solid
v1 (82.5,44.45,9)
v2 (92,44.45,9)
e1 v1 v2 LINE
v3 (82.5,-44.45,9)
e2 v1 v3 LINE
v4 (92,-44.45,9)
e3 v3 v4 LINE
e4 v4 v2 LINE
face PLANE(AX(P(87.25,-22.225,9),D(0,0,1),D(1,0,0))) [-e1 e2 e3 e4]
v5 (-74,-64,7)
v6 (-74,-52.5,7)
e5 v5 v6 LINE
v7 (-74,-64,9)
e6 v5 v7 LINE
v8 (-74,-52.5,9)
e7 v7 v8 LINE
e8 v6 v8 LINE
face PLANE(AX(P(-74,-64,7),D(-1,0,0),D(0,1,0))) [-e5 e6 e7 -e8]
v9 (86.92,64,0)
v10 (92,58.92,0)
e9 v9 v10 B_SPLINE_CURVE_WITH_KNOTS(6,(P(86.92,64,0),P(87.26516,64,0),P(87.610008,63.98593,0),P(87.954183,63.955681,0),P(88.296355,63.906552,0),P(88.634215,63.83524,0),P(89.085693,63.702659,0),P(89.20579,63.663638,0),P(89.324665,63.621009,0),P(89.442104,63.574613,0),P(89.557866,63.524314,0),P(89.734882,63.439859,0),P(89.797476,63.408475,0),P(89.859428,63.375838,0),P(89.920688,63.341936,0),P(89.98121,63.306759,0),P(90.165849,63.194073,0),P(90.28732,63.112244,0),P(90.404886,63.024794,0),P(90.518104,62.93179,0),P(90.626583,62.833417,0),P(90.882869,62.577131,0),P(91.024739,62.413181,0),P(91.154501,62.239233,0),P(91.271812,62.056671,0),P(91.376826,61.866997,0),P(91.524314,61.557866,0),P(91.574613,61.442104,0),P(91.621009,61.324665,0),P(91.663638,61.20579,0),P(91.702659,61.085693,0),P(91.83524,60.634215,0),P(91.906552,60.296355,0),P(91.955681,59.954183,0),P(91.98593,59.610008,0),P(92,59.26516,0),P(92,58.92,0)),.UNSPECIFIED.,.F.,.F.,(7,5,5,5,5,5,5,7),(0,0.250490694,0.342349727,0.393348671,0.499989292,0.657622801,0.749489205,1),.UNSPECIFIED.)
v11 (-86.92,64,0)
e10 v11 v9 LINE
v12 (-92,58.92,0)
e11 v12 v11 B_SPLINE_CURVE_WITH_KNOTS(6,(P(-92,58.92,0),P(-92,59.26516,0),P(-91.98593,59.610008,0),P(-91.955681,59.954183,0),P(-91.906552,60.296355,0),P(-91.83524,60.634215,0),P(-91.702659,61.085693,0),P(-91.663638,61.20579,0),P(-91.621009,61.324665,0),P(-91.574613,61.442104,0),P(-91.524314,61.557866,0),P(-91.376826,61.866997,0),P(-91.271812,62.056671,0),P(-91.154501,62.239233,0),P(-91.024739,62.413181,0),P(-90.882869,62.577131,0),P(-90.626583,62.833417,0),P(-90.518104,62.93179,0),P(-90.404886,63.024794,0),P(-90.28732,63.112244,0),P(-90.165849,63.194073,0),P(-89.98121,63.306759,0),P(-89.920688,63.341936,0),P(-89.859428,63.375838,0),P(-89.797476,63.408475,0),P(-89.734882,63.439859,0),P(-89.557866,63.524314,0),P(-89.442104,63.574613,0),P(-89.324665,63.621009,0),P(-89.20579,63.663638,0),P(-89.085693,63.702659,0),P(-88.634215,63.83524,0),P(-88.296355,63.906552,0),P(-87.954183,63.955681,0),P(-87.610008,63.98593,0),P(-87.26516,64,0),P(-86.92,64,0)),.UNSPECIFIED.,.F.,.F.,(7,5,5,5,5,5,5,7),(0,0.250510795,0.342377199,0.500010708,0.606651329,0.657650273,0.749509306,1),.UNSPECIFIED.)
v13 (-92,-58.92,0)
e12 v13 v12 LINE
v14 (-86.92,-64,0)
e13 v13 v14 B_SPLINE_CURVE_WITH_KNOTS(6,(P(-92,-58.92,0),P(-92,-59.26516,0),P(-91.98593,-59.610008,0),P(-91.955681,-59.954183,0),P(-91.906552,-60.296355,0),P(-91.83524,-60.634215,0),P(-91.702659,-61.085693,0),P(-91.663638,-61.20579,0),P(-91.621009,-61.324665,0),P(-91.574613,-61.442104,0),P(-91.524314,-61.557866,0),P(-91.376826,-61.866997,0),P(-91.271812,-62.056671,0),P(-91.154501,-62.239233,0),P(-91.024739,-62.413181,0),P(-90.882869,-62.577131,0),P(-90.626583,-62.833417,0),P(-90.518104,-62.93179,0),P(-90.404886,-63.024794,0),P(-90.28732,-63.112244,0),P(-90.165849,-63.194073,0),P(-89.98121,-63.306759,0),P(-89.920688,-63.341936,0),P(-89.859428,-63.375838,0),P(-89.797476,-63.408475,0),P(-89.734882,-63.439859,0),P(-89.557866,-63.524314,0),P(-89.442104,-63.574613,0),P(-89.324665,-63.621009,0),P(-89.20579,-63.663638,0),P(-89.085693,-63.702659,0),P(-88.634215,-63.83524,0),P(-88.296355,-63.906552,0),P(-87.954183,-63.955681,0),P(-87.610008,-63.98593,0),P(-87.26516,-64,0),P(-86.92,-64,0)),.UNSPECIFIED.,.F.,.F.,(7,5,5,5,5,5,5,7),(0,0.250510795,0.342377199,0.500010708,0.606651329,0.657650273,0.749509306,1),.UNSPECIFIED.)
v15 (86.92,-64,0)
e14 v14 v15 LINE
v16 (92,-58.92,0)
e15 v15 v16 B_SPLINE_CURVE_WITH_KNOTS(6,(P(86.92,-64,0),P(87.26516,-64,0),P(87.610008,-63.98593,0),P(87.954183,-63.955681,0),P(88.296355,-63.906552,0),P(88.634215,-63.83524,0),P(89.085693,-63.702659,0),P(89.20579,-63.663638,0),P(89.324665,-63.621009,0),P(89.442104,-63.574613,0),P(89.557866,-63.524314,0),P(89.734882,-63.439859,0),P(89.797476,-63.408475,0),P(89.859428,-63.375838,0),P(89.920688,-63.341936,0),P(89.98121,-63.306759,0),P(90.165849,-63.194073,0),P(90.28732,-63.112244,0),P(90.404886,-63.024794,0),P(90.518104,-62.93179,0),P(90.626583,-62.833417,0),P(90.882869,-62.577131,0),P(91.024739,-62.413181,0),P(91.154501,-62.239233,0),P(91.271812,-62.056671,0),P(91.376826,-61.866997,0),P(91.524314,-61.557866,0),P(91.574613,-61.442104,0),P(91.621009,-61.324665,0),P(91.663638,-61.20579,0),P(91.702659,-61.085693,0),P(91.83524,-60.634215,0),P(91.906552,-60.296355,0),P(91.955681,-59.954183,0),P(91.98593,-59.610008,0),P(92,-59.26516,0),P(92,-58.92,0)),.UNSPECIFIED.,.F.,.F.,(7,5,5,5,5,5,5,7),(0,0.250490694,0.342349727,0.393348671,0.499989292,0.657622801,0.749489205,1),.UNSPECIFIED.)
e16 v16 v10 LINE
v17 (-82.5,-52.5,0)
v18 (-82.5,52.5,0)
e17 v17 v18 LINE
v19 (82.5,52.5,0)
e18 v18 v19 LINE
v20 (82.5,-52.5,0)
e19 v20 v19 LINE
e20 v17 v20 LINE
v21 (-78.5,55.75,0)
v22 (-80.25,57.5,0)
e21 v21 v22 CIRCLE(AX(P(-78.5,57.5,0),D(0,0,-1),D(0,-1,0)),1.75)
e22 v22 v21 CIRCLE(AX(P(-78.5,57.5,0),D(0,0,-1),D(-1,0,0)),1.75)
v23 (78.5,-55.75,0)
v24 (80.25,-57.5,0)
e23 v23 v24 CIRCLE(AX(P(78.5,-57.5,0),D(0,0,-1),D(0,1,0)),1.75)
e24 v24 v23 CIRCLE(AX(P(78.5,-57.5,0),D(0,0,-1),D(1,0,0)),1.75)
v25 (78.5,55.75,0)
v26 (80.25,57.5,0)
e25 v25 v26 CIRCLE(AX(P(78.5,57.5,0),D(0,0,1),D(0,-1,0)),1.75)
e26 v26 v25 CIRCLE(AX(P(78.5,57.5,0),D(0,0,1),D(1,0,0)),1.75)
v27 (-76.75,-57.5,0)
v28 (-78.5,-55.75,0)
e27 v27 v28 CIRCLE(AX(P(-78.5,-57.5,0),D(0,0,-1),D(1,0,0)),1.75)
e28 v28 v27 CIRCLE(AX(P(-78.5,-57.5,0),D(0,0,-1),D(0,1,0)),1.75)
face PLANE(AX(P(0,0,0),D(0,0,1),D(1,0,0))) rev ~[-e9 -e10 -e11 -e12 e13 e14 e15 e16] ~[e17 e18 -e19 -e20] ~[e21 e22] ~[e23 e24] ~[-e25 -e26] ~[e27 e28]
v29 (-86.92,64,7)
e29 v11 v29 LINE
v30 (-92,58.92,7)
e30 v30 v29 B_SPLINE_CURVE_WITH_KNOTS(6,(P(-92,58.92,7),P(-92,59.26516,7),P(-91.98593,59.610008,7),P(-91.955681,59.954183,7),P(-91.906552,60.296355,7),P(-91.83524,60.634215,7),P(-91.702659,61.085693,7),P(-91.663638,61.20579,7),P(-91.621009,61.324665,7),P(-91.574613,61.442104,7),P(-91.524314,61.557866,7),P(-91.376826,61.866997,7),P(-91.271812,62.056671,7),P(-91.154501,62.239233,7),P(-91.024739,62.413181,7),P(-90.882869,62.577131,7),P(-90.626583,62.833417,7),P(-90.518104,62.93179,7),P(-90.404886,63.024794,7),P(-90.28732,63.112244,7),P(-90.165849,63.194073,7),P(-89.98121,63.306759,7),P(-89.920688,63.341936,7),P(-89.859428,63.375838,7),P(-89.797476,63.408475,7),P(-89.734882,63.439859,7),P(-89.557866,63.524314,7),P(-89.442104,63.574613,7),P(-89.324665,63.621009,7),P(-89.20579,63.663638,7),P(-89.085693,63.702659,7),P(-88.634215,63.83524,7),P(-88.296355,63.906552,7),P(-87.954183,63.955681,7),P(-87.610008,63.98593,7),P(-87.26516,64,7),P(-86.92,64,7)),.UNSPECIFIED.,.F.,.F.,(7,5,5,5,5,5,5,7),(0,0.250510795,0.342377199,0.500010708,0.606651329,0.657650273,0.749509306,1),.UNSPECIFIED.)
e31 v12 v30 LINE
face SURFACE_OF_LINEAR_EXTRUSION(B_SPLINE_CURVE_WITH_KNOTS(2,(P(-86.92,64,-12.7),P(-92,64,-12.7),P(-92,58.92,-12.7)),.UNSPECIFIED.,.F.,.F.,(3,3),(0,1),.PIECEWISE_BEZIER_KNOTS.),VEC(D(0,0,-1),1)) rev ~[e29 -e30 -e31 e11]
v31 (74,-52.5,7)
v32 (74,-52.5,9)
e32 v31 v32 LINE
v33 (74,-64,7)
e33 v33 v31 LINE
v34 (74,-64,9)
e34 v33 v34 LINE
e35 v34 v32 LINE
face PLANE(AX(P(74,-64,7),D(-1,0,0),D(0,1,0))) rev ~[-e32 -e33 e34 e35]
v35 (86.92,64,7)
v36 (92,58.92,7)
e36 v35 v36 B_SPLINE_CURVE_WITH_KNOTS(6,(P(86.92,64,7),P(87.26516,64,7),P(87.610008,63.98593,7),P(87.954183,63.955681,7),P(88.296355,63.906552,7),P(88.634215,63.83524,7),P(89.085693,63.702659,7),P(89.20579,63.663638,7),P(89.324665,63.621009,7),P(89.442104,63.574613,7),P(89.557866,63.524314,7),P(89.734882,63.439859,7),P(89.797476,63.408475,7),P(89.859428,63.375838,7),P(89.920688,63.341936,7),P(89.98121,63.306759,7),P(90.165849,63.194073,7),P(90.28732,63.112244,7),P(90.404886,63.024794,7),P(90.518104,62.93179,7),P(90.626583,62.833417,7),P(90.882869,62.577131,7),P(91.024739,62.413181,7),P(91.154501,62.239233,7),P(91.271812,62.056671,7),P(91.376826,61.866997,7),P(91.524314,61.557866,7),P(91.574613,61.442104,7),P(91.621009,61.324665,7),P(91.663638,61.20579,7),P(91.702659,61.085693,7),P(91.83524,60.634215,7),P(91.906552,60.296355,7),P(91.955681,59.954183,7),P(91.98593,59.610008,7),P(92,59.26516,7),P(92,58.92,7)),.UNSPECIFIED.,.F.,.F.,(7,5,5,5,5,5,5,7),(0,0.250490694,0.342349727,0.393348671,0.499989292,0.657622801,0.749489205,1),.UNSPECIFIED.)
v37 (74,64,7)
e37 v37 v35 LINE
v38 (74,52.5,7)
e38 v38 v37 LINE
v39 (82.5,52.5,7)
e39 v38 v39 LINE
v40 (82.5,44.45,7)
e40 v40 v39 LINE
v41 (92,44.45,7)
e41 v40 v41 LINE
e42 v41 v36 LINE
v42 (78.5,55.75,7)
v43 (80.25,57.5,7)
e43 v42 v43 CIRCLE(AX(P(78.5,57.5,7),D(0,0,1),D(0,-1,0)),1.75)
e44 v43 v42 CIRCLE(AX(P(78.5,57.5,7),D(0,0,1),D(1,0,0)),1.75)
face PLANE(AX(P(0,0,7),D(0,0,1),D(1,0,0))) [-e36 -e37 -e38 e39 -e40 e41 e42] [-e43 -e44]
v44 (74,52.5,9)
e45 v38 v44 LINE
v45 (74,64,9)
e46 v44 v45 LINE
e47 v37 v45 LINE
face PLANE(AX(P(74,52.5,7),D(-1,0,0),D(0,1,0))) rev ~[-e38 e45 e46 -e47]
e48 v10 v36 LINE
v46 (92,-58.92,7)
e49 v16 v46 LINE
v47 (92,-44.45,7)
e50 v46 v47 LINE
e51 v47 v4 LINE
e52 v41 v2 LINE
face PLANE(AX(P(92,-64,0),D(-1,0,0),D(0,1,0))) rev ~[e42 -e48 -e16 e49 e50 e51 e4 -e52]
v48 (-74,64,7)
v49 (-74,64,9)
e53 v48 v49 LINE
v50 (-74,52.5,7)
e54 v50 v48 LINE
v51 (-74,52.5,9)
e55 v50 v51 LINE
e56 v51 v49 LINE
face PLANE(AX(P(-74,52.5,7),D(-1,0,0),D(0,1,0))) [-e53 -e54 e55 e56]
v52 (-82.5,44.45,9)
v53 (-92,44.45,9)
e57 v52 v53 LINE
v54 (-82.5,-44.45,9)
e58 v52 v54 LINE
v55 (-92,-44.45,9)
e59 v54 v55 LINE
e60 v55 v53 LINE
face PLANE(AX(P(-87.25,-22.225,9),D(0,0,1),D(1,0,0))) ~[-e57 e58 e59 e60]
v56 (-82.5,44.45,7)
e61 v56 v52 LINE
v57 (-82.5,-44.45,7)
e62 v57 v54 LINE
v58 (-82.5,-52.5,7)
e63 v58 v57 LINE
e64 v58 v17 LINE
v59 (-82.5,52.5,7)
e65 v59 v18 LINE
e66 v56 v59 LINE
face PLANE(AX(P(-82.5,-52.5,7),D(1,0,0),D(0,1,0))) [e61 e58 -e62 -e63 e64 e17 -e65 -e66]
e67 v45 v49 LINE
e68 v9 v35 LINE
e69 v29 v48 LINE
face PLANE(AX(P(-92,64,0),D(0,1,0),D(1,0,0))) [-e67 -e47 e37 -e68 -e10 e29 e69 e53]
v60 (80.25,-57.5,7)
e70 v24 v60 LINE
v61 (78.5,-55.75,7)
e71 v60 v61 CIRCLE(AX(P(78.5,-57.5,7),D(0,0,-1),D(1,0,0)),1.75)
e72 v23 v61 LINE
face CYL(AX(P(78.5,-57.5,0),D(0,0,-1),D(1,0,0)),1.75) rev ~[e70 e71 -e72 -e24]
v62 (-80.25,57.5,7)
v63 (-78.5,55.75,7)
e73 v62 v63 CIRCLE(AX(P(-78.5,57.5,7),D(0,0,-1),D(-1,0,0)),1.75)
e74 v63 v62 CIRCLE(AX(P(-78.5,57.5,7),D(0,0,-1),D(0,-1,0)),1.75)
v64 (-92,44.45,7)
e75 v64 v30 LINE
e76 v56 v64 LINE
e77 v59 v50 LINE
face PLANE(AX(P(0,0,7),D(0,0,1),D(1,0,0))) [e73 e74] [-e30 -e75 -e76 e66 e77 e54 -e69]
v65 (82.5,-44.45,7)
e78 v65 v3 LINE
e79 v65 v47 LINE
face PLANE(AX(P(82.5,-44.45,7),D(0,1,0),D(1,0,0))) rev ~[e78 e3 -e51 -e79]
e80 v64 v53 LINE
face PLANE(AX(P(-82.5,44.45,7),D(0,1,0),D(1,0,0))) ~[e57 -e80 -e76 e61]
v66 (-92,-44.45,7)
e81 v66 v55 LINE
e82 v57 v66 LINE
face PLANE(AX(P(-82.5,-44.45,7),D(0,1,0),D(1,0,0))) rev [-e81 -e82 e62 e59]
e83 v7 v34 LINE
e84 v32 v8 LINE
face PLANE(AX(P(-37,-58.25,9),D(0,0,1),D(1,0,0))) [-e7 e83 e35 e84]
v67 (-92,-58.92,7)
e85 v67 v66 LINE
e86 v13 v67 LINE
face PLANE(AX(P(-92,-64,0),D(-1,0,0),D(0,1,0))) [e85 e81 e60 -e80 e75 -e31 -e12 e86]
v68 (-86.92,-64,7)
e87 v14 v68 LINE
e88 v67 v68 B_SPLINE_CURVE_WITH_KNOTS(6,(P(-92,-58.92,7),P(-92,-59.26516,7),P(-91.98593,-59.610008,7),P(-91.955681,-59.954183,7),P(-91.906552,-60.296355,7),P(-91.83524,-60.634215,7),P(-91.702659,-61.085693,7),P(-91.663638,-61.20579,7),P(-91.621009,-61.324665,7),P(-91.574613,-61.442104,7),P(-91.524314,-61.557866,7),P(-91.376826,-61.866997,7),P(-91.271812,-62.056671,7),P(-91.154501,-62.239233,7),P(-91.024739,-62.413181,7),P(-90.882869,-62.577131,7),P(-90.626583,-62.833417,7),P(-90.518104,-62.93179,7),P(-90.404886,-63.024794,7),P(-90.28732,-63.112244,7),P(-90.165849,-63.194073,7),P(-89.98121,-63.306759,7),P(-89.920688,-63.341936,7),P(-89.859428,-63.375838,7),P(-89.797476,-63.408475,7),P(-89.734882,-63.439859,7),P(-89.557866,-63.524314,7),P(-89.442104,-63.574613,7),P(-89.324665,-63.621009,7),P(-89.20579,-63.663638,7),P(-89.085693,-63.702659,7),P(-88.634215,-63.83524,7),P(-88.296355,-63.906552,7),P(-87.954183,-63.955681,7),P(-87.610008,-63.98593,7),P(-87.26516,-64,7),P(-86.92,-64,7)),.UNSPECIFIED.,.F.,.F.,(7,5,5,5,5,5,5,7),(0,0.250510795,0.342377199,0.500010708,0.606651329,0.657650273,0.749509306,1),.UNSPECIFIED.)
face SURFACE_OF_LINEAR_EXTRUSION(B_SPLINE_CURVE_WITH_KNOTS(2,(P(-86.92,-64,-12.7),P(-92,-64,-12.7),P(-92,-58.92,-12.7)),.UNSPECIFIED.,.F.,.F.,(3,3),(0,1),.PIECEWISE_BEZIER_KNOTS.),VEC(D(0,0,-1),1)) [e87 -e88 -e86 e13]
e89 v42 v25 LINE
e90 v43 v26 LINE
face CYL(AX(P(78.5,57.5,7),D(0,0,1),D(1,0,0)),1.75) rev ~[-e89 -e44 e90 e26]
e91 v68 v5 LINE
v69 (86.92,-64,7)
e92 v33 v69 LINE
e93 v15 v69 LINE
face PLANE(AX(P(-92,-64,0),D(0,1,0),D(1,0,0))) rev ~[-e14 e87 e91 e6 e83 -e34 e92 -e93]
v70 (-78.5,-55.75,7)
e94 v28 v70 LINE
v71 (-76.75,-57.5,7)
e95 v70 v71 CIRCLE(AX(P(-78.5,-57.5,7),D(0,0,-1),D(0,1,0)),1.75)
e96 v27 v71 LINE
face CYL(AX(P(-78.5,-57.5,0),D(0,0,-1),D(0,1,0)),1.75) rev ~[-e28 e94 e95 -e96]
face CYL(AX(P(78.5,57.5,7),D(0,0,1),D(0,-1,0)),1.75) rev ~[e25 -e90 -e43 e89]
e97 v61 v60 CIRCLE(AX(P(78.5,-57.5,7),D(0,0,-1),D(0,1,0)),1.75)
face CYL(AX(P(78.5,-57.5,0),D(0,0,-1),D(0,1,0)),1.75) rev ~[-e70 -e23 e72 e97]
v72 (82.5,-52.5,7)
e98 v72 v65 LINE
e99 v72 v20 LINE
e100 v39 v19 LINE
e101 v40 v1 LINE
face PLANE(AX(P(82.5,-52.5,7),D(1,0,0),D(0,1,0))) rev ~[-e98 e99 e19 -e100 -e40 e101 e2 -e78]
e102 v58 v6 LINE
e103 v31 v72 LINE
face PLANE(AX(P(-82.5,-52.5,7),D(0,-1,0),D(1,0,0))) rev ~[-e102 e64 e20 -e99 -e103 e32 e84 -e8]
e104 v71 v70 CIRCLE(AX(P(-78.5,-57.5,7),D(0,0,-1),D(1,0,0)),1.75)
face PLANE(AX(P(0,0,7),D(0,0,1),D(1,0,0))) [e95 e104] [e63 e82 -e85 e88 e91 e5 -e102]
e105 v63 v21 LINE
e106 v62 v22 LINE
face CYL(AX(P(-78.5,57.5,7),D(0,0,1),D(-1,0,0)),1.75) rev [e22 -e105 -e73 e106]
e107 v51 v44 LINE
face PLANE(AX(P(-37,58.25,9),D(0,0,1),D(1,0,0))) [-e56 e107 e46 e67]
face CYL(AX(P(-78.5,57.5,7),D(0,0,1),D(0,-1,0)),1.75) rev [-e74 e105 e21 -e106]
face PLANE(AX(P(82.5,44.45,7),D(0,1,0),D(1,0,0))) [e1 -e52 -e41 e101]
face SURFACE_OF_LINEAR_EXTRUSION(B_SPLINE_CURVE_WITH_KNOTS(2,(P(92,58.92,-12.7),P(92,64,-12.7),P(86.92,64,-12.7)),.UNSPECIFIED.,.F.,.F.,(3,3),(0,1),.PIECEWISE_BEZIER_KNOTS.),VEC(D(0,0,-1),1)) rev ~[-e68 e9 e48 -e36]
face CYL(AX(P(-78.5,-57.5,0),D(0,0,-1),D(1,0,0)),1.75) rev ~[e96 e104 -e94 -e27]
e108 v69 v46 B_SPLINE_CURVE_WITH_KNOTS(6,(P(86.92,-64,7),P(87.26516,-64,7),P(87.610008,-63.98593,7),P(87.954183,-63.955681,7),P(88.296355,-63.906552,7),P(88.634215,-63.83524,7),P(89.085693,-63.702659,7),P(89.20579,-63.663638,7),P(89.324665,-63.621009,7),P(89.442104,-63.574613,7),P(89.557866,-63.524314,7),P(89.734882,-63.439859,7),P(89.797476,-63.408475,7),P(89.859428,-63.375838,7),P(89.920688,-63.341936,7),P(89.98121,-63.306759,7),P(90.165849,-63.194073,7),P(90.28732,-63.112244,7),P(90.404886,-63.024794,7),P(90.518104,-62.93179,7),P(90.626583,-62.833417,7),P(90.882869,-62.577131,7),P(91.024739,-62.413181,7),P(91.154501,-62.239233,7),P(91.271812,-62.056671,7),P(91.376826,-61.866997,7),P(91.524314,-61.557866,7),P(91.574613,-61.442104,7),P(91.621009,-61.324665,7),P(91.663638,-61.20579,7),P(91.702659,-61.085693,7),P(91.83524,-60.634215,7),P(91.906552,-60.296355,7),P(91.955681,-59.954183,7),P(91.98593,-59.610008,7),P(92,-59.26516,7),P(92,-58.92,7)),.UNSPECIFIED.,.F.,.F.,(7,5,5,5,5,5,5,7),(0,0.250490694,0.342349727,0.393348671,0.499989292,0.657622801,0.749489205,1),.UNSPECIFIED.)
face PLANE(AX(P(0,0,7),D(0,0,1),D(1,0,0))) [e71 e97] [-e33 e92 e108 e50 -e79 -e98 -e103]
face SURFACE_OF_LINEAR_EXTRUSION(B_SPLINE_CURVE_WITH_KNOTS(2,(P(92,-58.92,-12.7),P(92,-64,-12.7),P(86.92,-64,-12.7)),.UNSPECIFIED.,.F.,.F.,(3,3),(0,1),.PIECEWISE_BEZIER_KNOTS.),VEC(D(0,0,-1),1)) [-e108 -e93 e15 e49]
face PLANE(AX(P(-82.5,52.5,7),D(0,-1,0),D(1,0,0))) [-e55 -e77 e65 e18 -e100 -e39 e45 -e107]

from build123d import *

# Parameters (mm, degrees)
F0_W        = 184
F0_H        = 128
F1_DEPTH    = 7
F2_W        = 165
F2_H        = 105
F3_DEPTH    = 7
F4_W        = 74
F4_H        = 11.5
F5_DEPTH    = 2
F6_T1_DEPTH = 32.4
F7_W        = 9.5
F7_H        = 44.45
F8_DEPTH    = 2
F10_DEPTH   = 7
F12_DEPTH   = 7


# Not quite as in the source:
# - a fillet or chamfer that OpenCascade refuses, or shapes differently, is made with other operations: its cross-section is extruded or revolved along the edge and cut away or added
# - a pattern or mirror of a feature is missing from the dataset's text; its kind, count and spacing are read off the source's solid


with BuildPart() as f1:
    # F0 (on Top) → F1 (new body)
    with BuildSketch(Plane.XY):
        Rectangle(F0_W, F0_H)
    extrude(amount=F1_DEPTH)

    # F2 (on face) → F3 (cut, through all)
    with BuildSketch(Plane.XY.offset(7)):
        Rectangle(F2_W, F2_H)
    extrude(amount=-F3_DEPTH, mode=Mode.SUBTRACT)

    # F4 (on face) → F5 (join)
    with BuildSketch(Plane.XY.offset(7)):
        with Locations((-37, 58.25)):
            Rectangle(F4_W, F4_H)
        with Locations((37, 58.25)):
            Rectangle(F4_W, F4_H)
        with Locations((-37, -58.25)):
            Rectangle(F4_W, F4_H)
        with Locations((37, -58.25)):
            Rectangle(F4_W, F4_H)
    extrude(amount=F5_DEPTH)

    # F6: fillet of radius 5.08 on 4 edges, made by hand

    # F6_s2 → F6_t1 (cut)
    with BuildSketch(Plane.XY.offset(-12.7)):
        with BuildLine():
            add(Edge.make_bspline(
                [(92, -58.92), (92, -64), (86.92, -64)],
                knots=[0, 0, 0, 1, 1, 1], degree=2, weights=[1, 1, 1]))
            Line((86.92, -64), (92, -64))
            Line((92, -64), (92, -58.92))
        make_face()
        with BuildLine():
            add(Edge.make_bspline(
                [(92, 58.92), (92, 64), (86.92, 64)],
                knots=[0, 0, 0, 1, 1, 1], degree=2, weights=[1, 1, 1]))
            Line((86.92, 64), (92, 64))
            Line((92, 64), (92, 58.92))
        make_face()
        with BuildLine():
            add(Edge.make_bspline(
                [(-86.92, 64), (-92, 64), (-92, 58.92)],
                knots=[0, 0, 0, 1, 1, 1], degree=2, weights=[1, 1, 1]))
            Line((-92, 58.92), (-92, 64))
            Line((-92, 64), (-86.92, 64))
        make_face()
        with BuildLine():
            add(Edge.make_bspline(
                [(-86.92, -64), (-92, -64), (-92, -58.92)],
                knots=[0, 0, 0, 1, 1, 1], degree=2, weights=[1, 1, 1]))
            Line((-92, -58.92), (-92, -64))
            Line((-92, -64), (-86.92, -64))
        make_face()
    extrude(amount=F6_T1_DEPTH, mode=Mode.SUBTRACT)

    # F7 (on face) → F8 (join)
    with BuildSketch(Plane.XY.offset(7)):
        with Locations((87.25, -22.225)):
            Rectangle(F7_W, F7_H)
        with Locations((87.25, 22.225)):
            Rectangle(F7_W, F7_H)
    f8 = extrude(amount=F8_DEPTH)

    # F8_copies: F8 across plane
    add(f8.mirror(Plane(origin=(0, 0, 0), x_dir=(0, 0, -1), z_dir=(-1, 0, 0))))

    # F9 (on face) → F10 (cut, through all)
    with BuildSketch(Plane.XY.offset(7)):
        with BuildLine():
            ThreePointArc((80.25, 57.5), (77.2625631329, 58.7374368671), (78.5, 55.75))
            ThreePointArc((78.5, 55.75), (79.7374368671, 56.2625631329), (80.25, 57.5))
        make_face()
    f10 = extrude(amount=-F10_DEPTH, mode=Mode.SUBTRACT)

    # F10_copies: F10 across plane
    add(f10.mirror(Plane(origin=(0, 0, 0), x_dir=(0, 0, -1), z_dir=(-1, 0, 0))), mode=Mode.SUBTRACT)

    # F11 (on face) → F12 (cut, through all)
    with BuildSketch(Plane(origin=(0, 0, 0), x_dir=(1, 0, 0), z_dir=(0, 0, -1))):
        with BuildLine():
            ThreePointArc((-76.75, 57.5), (-79.7374368671, 58.7374368671), (-78.5, 55.75))
            ThreePointArc((-78.5, 55.75), (-77.2625631329, 56.2625631329), (-76.75, 57.5))
        make_face()
        with BuildLine():
            ThreePointArc((80.25, 57.5), (77.2625631329, 58.7374368671), (78.5, 55.75))
            ThreePointArc((78.5, 55.75), (79.7374368671, 56.2625631329), (80.25, 57.5))
        make_face()
    extrude(amount=-F12_DEPTH, mode=Mode.SUBTRACT)


solid = f1.part
